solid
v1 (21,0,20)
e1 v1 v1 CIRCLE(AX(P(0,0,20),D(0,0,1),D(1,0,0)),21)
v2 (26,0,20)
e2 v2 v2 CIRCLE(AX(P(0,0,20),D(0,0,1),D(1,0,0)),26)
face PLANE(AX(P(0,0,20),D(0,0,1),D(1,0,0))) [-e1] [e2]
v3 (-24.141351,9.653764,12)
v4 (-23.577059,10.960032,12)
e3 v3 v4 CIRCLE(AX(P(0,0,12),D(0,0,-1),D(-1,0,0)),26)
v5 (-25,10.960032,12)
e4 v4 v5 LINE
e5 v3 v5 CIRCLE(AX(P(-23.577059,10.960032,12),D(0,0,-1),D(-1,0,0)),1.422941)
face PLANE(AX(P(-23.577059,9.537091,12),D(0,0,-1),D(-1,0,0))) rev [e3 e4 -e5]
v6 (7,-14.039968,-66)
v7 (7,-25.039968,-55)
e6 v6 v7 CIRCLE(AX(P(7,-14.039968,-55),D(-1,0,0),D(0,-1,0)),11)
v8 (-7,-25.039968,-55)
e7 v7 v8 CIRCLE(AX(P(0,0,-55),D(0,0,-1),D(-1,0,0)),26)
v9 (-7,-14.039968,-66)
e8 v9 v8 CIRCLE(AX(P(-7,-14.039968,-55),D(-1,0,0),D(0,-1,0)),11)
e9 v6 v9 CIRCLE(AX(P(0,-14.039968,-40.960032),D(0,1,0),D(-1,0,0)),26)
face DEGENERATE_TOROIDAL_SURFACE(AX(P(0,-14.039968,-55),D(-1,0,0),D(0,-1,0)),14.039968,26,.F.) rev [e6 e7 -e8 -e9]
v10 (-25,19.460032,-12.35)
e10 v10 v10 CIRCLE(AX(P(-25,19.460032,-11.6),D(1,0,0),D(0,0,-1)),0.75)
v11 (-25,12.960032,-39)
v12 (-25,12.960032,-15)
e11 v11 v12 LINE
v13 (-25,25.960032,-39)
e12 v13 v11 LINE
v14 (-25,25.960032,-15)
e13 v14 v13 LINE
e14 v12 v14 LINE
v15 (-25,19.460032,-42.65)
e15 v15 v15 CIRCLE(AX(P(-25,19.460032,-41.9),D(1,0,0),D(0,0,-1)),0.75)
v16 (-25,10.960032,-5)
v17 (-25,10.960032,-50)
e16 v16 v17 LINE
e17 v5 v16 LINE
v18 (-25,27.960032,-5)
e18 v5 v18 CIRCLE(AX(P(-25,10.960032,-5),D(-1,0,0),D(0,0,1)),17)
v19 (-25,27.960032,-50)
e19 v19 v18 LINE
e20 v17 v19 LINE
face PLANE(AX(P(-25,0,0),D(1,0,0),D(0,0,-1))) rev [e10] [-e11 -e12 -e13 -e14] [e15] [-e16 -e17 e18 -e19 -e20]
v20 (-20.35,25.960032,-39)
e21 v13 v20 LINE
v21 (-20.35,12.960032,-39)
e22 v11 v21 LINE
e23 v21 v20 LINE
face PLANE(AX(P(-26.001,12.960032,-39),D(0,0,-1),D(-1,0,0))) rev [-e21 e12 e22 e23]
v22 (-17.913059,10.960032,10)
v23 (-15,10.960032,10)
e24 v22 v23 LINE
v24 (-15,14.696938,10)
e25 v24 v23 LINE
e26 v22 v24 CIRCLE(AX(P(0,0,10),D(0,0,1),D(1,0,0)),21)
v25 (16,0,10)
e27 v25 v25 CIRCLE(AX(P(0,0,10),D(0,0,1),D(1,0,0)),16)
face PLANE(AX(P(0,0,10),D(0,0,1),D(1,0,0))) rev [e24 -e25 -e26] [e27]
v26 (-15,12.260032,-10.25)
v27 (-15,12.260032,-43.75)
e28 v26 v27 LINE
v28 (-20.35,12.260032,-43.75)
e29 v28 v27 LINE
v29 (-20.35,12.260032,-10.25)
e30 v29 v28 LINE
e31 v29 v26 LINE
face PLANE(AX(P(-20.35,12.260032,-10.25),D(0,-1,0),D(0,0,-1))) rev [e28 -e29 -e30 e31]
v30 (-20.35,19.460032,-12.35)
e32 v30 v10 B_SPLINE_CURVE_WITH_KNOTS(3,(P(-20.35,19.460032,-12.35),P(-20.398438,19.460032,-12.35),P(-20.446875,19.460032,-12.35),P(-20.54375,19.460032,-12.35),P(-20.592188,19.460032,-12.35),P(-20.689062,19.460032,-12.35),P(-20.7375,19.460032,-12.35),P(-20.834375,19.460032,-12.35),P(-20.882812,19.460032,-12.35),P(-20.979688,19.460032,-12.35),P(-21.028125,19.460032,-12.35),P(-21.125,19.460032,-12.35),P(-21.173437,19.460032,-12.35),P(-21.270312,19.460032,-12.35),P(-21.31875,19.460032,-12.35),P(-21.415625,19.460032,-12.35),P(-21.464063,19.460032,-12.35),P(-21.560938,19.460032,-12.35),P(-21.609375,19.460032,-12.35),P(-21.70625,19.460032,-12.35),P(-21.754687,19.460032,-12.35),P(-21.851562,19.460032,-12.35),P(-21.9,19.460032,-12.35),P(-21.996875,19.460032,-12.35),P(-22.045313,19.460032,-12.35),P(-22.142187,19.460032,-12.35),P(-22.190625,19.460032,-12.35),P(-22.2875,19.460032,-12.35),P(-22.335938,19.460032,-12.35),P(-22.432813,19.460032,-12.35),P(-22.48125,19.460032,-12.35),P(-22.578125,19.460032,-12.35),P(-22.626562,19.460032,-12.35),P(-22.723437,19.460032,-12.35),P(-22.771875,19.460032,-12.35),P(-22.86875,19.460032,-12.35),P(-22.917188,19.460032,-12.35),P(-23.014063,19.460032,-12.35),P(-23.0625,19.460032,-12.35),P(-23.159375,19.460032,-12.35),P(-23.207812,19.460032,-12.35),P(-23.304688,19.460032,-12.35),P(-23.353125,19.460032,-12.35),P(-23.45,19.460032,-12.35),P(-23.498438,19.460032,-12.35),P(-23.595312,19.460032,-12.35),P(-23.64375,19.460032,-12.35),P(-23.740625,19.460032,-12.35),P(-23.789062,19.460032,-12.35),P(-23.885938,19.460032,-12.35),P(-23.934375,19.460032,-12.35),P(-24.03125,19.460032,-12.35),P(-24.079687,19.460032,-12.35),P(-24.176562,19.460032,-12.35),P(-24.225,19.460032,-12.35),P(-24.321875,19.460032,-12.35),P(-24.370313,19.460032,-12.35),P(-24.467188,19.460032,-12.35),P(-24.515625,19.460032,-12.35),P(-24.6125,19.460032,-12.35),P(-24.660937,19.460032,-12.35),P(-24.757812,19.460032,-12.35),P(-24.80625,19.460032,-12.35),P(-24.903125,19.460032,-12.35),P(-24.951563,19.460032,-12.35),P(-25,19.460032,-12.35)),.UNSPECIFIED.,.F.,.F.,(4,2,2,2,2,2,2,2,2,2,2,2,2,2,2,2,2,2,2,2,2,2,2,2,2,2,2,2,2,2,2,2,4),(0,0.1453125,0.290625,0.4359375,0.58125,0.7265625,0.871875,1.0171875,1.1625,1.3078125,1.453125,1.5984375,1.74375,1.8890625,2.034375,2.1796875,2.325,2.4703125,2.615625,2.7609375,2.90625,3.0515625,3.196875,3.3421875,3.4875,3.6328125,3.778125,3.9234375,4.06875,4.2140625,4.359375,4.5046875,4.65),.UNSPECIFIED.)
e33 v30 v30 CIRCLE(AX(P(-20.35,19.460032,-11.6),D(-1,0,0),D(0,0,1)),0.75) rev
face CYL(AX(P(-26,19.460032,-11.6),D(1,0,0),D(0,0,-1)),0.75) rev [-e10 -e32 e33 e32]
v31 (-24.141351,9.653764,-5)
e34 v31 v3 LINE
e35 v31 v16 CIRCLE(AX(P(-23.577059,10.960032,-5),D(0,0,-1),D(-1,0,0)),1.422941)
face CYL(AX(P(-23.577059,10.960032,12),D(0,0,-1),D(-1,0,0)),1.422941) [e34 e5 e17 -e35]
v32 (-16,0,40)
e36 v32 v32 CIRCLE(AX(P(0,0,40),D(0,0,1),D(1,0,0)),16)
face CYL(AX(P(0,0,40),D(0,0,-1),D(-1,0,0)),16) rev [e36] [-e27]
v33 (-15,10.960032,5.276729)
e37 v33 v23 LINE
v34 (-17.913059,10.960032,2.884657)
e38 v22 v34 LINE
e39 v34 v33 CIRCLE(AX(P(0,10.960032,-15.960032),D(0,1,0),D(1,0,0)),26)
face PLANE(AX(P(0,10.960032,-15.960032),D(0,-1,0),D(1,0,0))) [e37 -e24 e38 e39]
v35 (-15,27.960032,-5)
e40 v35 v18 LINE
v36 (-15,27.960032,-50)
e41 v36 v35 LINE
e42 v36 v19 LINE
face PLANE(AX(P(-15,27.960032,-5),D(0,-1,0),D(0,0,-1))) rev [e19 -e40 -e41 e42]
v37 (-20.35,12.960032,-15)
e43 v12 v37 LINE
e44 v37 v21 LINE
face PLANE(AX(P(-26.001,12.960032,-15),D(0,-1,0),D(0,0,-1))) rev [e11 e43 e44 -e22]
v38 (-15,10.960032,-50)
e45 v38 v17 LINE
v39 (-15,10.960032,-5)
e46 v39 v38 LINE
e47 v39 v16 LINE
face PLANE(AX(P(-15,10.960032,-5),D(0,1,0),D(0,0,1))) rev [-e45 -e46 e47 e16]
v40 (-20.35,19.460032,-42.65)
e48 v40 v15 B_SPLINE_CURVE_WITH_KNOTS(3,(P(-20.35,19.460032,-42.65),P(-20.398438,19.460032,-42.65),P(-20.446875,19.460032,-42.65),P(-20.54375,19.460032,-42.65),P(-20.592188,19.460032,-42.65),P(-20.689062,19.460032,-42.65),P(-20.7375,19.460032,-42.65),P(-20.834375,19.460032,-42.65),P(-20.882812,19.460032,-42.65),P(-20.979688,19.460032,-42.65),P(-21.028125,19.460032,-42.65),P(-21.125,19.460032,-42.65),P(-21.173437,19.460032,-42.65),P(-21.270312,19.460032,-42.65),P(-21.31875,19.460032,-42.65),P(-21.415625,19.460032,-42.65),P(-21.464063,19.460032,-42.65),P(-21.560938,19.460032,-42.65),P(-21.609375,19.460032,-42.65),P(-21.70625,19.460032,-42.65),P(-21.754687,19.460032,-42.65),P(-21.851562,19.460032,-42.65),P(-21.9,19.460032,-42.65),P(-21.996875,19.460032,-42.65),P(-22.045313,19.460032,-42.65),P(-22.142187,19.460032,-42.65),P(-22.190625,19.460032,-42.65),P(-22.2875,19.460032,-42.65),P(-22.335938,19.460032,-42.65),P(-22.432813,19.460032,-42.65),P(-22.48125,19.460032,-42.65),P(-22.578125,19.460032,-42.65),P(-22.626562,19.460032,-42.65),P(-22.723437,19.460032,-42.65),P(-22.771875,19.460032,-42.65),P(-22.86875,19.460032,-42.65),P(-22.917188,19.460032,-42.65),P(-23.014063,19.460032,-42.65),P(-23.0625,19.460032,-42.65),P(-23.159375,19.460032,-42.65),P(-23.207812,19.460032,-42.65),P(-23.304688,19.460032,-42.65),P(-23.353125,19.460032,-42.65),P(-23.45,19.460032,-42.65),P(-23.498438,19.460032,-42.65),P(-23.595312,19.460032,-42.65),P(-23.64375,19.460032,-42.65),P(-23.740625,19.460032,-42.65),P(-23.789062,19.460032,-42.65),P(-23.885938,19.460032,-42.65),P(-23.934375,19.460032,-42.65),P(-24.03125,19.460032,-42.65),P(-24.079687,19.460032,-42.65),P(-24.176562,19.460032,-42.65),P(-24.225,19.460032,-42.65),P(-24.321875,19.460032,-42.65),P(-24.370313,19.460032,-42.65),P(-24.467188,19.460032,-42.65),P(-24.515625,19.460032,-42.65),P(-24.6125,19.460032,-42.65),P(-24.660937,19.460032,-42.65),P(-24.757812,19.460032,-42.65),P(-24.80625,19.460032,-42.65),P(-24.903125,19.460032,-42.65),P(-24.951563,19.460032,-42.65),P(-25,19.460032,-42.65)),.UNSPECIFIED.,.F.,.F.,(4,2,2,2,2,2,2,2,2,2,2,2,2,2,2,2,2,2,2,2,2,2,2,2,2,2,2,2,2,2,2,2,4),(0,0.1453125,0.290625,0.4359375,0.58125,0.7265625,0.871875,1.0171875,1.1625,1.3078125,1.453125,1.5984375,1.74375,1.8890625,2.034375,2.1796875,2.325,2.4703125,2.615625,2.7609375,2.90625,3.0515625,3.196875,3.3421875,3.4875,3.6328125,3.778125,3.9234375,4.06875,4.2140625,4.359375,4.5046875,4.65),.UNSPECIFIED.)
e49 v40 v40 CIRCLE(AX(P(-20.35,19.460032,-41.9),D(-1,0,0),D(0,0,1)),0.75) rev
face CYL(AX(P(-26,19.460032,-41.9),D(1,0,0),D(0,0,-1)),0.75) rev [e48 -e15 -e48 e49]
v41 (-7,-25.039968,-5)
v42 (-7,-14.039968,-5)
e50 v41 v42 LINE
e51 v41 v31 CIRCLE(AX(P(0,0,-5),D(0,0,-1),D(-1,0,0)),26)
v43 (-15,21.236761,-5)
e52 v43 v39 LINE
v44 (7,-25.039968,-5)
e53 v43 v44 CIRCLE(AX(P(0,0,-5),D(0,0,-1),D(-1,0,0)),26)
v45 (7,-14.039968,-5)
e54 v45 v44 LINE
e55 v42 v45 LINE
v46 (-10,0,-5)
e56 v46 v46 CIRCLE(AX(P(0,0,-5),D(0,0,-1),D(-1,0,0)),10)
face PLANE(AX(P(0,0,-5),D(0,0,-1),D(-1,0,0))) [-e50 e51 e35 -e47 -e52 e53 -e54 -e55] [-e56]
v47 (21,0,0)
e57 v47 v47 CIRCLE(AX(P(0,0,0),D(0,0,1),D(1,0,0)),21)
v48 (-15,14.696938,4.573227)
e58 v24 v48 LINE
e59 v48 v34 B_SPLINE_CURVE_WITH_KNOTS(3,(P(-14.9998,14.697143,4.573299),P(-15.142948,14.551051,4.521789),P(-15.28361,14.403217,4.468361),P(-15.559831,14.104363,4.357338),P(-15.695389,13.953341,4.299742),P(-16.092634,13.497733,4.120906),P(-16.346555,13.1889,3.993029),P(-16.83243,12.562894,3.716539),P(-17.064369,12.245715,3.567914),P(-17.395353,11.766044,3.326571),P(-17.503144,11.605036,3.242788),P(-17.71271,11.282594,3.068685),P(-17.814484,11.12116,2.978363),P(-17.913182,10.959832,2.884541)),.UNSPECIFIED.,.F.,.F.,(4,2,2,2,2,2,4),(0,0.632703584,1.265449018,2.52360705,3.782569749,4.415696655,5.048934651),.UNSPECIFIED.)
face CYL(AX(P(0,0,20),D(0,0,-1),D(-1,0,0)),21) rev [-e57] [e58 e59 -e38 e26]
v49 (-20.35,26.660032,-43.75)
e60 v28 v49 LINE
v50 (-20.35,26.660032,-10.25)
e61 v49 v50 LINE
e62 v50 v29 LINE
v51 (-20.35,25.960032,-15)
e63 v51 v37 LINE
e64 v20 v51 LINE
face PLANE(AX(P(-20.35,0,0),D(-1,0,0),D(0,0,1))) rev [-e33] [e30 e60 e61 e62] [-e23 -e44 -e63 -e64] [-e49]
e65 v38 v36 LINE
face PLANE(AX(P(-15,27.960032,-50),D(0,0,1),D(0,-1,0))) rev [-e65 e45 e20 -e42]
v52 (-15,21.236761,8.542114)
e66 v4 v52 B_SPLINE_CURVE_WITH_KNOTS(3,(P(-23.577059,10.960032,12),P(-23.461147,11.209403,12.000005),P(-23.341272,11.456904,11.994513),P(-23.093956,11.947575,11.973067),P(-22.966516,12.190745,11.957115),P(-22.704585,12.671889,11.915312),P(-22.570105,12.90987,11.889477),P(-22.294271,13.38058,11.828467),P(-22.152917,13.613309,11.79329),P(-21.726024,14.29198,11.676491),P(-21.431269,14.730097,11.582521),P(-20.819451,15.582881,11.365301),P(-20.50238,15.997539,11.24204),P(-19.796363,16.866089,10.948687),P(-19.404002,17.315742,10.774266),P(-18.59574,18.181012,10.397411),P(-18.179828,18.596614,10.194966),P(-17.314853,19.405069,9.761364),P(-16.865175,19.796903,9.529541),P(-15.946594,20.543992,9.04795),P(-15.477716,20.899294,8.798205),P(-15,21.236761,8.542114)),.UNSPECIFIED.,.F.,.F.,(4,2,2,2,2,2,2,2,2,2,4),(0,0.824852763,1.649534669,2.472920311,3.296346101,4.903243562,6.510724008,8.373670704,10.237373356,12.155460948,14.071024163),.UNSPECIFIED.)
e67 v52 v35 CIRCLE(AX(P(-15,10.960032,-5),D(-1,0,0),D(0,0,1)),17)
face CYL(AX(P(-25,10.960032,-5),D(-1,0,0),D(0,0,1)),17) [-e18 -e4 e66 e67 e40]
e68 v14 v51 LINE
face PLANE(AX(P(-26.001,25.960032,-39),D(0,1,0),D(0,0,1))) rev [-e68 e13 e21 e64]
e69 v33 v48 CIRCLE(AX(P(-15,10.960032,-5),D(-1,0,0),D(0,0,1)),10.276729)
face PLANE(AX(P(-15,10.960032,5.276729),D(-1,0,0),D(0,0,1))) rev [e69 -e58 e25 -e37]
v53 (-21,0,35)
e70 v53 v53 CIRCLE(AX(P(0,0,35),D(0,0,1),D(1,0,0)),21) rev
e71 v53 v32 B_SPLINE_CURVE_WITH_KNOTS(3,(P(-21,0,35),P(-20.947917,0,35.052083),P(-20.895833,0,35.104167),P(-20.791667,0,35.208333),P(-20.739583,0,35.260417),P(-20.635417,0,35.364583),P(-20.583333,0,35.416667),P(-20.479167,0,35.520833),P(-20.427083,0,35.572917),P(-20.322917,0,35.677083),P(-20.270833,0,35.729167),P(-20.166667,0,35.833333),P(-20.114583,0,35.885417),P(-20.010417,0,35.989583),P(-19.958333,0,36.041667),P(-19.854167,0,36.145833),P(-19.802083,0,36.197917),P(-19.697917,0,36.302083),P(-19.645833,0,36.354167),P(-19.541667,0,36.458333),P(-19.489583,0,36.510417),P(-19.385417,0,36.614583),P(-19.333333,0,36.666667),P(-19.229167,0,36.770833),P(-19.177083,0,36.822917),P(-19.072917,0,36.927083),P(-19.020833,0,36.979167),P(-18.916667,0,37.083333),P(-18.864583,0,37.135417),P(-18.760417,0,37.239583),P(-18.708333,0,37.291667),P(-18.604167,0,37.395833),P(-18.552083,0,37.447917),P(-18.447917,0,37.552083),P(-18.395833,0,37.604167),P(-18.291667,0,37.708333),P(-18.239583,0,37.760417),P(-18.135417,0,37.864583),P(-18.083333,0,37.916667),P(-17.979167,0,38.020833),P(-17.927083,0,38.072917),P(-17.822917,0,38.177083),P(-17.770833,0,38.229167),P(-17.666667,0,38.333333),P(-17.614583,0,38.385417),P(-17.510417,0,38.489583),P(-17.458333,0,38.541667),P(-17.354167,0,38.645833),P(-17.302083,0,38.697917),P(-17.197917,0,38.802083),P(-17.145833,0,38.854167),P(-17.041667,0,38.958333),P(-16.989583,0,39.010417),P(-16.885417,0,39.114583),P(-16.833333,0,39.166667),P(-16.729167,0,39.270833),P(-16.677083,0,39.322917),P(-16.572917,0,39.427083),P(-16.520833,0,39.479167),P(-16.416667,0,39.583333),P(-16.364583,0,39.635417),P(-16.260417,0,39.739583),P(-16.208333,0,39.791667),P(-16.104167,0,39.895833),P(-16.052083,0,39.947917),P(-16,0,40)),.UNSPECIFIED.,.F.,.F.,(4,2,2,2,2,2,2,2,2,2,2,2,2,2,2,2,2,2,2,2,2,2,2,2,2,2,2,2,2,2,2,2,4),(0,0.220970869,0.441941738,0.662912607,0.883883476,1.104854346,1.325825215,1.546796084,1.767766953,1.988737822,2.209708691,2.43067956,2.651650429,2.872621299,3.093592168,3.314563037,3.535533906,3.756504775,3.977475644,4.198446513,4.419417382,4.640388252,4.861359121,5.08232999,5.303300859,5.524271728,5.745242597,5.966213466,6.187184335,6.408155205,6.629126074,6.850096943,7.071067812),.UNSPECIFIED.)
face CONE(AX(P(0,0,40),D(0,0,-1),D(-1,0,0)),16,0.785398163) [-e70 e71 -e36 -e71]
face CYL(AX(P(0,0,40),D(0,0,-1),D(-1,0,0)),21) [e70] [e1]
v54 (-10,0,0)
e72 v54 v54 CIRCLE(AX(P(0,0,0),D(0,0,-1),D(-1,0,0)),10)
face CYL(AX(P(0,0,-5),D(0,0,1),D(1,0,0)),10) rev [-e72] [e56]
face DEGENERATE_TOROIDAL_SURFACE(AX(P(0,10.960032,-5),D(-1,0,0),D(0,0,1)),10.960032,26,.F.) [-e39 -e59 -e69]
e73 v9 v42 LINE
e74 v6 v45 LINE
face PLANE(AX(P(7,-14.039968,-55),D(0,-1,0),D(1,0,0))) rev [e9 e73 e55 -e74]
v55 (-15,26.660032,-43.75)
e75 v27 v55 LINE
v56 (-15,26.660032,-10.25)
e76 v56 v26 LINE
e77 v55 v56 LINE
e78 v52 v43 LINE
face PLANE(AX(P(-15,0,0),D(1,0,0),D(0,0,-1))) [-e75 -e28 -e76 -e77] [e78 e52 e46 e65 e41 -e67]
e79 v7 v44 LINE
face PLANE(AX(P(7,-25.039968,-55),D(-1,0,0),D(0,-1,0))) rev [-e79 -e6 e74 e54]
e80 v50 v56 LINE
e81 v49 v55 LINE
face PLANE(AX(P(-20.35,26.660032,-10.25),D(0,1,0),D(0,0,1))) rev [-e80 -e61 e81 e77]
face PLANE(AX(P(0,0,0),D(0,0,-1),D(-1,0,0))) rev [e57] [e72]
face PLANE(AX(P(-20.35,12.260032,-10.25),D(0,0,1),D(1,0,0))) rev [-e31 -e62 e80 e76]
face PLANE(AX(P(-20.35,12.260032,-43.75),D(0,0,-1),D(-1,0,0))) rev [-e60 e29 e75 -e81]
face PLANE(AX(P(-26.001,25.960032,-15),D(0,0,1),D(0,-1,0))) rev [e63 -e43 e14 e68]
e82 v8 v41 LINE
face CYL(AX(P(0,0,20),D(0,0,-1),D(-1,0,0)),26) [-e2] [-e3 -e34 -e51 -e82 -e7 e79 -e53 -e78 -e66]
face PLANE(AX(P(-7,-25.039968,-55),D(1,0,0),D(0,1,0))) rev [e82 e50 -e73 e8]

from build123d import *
from build123d.topology import SkipClean

# Parameters (mm, degrees)
SKETCH15_R          = 26
SKETCH15_R_2        = 21
BOSS_EXTRUDE2_DEPTH = 20
BOSS_EXTRUDE5_START = -10
SKETCH18_R          = 21
SKETCH18_R_2        = 16
BOSS_EXTRUDE5_DEPTH = 30
CHAMFER1_SIZE       = 5
BOSS_EXTRUDE6_START = 5
SKETCH21_R          = 26
SKETCH21_R_2        = 10
BOSS_EXTRUDE6_DEPTH = 5
BOSS_EXTRUDE8_START = 50
BOSS_EXTRUDE8_DEPTH = 50
REVOLVE2_ANGLE      = 90
BOSS_EXTRUDE9_START = -20
SKETCH26_W          = 45
SKETCH26_H          = 17
BOSS_EXTRUDE9_DEPTH = 5
CUT_EXTRUDE1_REACH  = 85.345
SKETCH27_W          = 24
SKETCH27_H          = 13
REVOLVE3_ANGLE      = 90
SKETCH29_W          = 1.422941242
SKETCH29_H          = 17
REVOLVE4_ANGLE      = 90
SKETCH31_R          = 0.75
CUT_EXTRUDE2_DEPTH  = 84.345121507
SKETCH32_W          = 33.5
SKETCH32_H          = 14.4
CUT_EXTRUDE3_DEPTH  = 5.35


with BuildPart() as part:
    # Sketch15 → Boss-Extrude2 (new body)
    with BuildSketch(Plane.XY):
        Circle(SKETCH15_R)
        Circle(SKETCH15_R_2, mode=Mode.SUBTRACT)
    extrude(amount=BOSS_EXTRUDE2_DEPTH)

    # Sketch18 → Boss-Extrude5 (add)
    with BuildSketch(Plane.XY.offset(20).offset(BOSS_EXTRUDE5_START)):
        Circle(SKETCH18_R)
        Circle(SKETCH18_R_2, mode=Mode.SUBTRACT)
    extrude(amount=BOSS_EXTRUDE5_DEPTH)

    # Chamfer1
    chamfer1_edges = [part.edges().sort_by_distance(p)[0] for p in [
        (-21, 0, 40),
    ]]
    chamfer(chamfer1_edges, length=CHAMFER1_SIZE - 0.0001)  # a hair under: the kernel refuses the full size

    # Sketch21 → Boss-Extrude6 (add)
    with BuildSketch(Plane(origin=(0, 0, 0), x_dir=(-1, 0, 0), z_dir=(0, 0, -1)).offset(BOSS_EXTRUDE6_START)):
        Circle(SKETCH21_R)
        Circle(SKETCH21_R_2, mode=Mode.SUBTRACT)
    extrude(amount=-BOSS_EXTRUDE6_DEPTH)

    # Sketch23 → Boss-Extrude8 (add)
    with BuildSketch(Plane(origin=(0, 0, -5), x_dir=(-1, 0, 0), z_dir=(0, 0, -1)).offset(BOSS_EXTRUDE8_START)):
        with BuildLine():
            Line((-7, -25.039968051), (-7, -14.039968051))
            Line((-7, -14.039968051), (7, -14.039968051))
            Line((7, -14.039968051), (7, -25.039968051))
            ThreePointArc((7, -25.039968051), (0, -26), (-7, -25.039968051))
        make_face()
    extrude(amount=-BOSS_EXTRUDE8_DEPTH)

    # Sketch25 → Revolve2 (revolve)
    with SkipClean():  # the faces are left unmerged after this step: merging them gives an invalid solid
        with BuildSketch(Plane(origin=(0, 0, -55), x_dir=(-1, 0, 0), z_dir=(0, 0, -1))):
            with BuildLine():
                Line((-7, -14.039968051), (-7, -25.039968051))
                ThreePointArc((-7, -25.039968051), (0, -26), (7, -25.039968051))
                Line((7, -25.039968051), (7, -14.039968051))
                Line((7, -14.039968051), (-7, -14.039968051))
            make_face()
        revolve(axis=Axis((-7, -14.039968051, -55), (1, 0, 0)), revolution_arc=REVOLVE2_ANGLE)

    # Sketch26 → Boss-Extrude9 (add, symmetric)
    with BuildSketch(Plane(origin=(0, 0, 0), x_dir=(0, 0, -1), z_dir=(1, 0, 0)).offset(BOSS_EXTRUDE9_START)):
        with Locations((27.5, 19.460031949)):
            Rectangle(SKETCH26_W, SKETCH26_H)
    extrude(amount=BOSS_EXTRUDE9_DEPTH, both=True)

    # Sketch27 → Cut-Extrude1 (cut, up to next)
    with BuildSketch(Plane(origin=(-15, 0, 0), x_dir=(0, 0, -1), z_dir=(1, 0, 0)), mode=Mode.PRIVATE) as cut_extrude1_sk1:
        with Locations((27, 19.460031949)):
            Rectangle(SKETCH27_W, SKETCH27_H)
    cut_extrude1_tool1 = extrude(cut_extrude1_sk1.sketch, amount=-CUT_EXTRUDE1_REACH, mode=Mode.PRIVATE) & part.part
    add(cut_extrude1_tool1.solids().sort_by_distance((-15, 19.460032, -27))[0], mode=Mode.SUBTRACT)

    # Sketch28 → Revolve3 (revolve)
    with SkipClean():  # the faces are left unmerged after this step: merging them gives an invalid solid
        with BuildSketch(Plane.XY.offset(-5)):
            with BuildLine():
                Line((-25, 10.960031949), (-23.577058758, 10.960031949))
                ThreePointArc((-23.577058758, 10.960031949), (-19.961216232, 16.659827326), (-15, 21.236760582))
                Line((-15, 21.236760582), (-15, 27.960031949))
                Line((-15, 27.960031949), (-25, 27.960031949))
                Line((-25, 27.960031949), (-25, 10.960031949))
            make_face()
        revolve(axis=Axis((-25, 10.960031949, -5), (1, 0, 0)), revolution_arc=REVOLVE3_ANGLE)

    # Sketch29 → Revolve4 (revolve)
    with SkipClean():  # the faces are left unmerged after this step: merging them gives an invalid solid
        with BuildSketch(Plane.XZ.offset(-10.960031949)):
            with Locations((-24.288529379, 3.5)):
                Rectangle(SKETCH29_W, SKETCH29_H)
        revolve(axis=Axis((-23.577058758, 10.960031949, 12), (0, 0, 1)), revolution_arc=REVOLVE4_ANGLE)

    # Sketch31 → Cut-Extrude2 (cut, through all)
    with SkipClean():  # the faces are left unmerged after this step: merging them gives an invalid solid
        with BuildSketch(Plane(origin=(-15, 0, 0), x_dir=(0, 0, -1), z_dir=(1, 0, 0))):
            with Locations((41.9, 19.460031949)):
                Circle(SKETCH31_R)
            with Locations((11.6, 19.460031949)):
                Circle(SKETCH31_R)
        extrude(amount=-CUT_EXTRUDE2_DEPTH, mode=Mode.SUBTRACT)

    # Sketch32 → Cut-Extrude3 (cut)
    with SkipClean():  # the faces are left unmerged after this step: merging them gives an invalid solid
        with BuildSketch(Plane(origin=(-15, 0, 0), x_dir=(0, 0, -1), z_dir=(1, 0, 0))):
            with Locations((27, 19.460031949)):
                Rectangle(SKETCH32_W, SKETCH32_H)
        extrude(amount=-CUT_EXTRUDE3_DEPTH, mode=Mode.SUBTRACT)


solid = part.part
